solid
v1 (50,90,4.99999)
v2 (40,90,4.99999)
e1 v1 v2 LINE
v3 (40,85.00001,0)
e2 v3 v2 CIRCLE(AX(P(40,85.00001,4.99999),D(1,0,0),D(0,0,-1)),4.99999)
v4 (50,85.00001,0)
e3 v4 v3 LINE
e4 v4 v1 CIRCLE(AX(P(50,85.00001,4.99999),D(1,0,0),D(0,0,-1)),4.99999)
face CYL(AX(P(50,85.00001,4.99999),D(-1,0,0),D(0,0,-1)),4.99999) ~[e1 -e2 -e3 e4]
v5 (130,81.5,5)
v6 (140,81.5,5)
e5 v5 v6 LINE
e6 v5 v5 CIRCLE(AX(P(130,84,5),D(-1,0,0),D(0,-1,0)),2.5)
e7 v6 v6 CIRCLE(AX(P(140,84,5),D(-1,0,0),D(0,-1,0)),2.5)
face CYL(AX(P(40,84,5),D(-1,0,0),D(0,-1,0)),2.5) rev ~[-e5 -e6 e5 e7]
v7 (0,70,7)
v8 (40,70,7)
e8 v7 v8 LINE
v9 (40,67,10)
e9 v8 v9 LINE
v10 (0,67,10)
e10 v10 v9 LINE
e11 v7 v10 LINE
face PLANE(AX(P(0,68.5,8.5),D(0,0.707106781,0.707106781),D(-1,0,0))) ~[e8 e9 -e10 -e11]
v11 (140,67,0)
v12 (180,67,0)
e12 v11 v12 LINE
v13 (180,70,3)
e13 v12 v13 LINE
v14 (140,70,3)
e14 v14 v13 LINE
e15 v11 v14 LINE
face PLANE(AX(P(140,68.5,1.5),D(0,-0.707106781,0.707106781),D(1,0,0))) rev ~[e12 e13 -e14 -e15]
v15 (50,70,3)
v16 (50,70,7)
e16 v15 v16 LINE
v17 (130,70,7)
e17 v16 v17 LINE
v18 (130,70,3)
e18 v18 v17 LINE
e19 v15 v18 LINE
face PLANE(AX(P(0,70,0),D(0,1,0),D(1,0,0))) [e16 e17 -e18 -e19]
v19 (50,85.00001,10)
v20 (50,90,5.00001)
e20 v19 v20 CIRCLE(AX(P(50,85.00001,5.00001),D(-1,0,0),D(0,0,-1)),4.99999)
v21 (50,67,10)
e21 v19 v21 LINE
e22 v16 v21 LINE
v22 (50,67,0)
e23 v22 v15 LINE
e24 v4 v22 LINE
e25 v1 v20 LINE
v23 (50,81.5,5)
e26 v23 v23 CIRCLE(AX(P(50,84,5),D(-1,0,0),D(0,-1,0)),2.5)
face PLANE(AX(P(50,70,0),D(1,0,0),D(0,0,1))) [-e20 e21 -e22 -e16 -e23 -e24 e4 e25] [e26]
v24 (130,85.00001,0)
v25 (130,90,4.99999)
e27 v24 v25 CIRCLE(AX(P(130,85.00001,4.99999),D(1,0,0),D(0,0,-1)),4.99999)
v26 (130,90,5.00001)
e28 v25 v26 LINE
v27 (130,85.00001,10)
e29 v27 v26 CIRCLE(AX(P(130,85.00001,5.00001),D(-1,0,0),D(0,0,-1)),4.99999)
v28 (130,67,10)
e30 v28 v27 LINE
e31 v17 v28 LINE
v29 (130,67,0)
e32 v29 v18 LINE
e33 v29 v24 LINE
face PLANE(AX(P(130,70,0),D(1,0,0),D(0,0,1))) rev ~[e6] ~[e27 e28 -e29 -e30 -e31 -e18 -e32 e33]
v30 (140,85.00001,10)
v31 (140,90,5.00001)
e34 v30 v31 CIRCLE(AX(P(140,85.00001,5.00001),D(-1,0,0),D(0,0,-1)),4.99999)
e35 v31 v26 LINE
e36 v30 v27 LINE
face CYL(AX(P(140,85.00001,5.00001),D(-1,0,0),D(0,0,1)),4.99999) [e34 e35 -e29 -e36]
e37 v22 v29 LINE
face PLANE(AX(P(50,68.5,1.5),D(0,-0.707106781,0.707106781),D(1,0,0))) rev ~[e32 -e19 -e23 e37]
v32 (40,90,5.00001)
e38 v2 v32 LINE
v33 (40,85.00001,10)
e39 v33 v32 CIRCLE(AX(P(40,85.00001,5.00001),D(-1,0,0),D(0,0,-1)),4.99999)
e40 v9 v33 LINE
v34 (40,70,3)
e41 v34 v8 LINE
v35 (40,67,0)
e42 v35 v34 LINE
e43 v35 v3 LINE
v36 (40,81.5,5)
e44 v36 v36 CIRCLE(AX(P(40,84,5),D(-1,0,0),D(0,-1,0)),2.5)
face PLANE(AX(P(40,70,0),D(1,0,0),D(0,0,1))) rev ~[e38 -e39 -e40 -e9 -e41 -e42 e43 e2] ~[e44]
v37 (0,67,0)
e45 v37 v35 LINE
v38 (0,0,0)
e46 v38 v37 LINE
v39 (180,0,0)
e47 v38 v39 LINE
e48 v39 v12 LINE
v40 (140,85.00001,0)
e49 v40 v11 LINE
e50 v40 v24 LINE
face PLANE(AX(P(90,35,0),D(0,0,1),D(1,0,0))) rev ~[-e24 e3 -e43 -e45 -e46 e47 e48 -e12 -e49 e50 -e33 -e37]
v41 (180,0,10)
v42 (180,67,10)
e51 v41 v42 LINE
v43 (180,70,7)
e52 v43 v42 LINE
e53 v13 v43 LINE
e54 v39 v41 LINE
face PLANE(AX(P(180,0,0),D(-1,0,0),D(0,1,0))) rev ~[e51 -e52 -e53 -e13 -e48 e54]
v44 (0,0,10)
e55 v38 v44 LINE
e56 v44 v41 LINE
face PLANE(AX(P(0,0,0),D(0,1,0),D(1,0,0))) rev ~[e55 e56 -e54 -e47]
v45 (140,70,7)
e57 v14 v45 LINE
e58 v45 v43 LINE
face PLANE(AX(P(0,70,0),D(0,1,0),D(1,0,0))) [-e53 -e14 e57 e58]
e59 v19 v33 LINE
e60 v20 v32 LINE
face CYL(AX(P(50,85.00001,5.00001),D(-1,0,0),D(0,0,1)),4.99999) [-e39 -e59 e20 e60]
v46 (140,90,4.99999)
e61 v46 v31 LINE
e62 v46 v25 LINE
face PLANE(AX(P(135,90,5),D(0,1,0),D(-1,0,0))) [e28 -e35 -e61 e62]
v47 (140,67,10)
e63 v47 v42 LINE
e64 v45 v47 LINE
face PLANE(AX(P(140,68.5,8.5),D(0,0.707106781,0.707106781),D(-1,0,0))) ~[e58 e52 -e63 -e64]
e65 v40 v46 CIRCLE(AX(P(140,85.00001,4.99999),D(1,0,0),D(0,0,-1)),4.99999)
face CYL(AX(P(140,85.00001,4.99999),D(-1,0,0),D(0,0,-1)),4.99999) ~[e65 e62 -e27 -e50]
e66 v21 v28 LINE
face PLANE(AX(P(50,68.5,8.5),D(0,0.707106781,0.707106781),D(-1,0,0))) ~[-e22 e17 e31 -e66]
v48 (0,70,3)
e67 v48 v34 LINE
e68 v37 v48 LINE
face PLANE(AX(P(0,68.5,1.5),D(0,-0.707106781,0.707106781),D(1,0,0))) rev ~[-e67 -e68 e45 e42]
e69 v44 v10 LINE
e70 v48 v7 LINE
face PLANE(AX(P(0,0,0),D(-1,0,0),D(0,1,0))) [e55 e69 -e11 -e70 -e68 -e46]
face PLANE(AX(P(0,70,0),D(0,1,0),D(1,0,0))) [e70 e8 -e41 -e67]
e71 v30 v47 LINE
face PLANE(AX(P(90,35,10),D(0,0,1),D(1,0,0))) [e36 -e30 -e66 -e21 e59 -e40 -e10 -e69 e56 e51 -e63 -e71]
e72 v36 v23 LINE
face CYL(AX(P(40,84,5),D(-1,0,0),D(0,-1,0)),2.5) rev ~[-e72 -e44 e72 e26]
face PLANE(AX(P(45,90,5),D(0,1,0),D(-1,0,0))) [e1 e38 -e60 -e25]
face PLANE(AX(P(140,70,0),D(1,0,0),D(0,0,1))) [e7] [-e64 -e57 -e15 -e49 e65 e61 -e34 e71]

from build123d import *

# Parameters (mm, degrees)
F0_W     = 180
F0_H     = 70
F1_DEPTH = 10
F3_W     = 10
F3_H     = 10
F4_DEPTH = 20
F5_R     = 2.5
F6_DEPTH = 140.001
F7_R     = 4.99999
F8_SIZE  = 3


# Not quite as in the source:
# - a fillet or chamfer is up to 0.001 mm smaller than in the source, because OpenCascade refuses the exact size


with BuildPart() as f1:
    # F0 (on Top) → F1 (new body)
    with BuildSketch(Plane.XY):
        with Locations((90, 35)):
            Rectangle(F0_W, F0_H)
    extrude(amount=F1_DEPTH)

    # F3 (on face) → F4 (join)
    with BuildSketch(Plane(origin=(0, 70, 0), x_dir=(-1, 0, 0), z_dir=(0, 1, 0))):
        with Locations((-135, 5)):
            Rectangle(F3_W, F3_H)
        with Locations((-45, 5)):
            Rectangle(F3_W, F3_H)
    extrude(amount=F4_DEPTH)

    # F5 (on face) → F6 (cut, through all)
    with BuildSketch(Plane(origin=(40, 0, 0), x_dir=(0, -1, 0), z_dir=(-1, 0, 0))):
        with Locations((-84, 5)):
            Circle(F5_R)
    extrude(amount=-F6_DEPTH, mode=Mode.SUBTRACT)

    # F7 (radius 5 in the source; OpenCascade refuses exactly that, so slightly less here)
    f7_edges = [f1.edges().sort_by_distance(p)[0] for p in [
        (135, 90, 10),
        (135, 90, 0),
        (45, 90, 0),
        (45, 90, 10),
    ]]
    fillet(f7_edges, radius=F7_R)

    # F8
    f8_edges = [f1.edges().sort_by_distance(p)[0] for p in [
        (90, 70, 10),
        (20, 70, 10),
        (160, 70, 10),
        (160, 70, 0),
        (90, 70, 0),
        (20, 70, 0),
    ]]
    chamfer(f8_edges, length=F8_SIZE)


solid = f1.part
